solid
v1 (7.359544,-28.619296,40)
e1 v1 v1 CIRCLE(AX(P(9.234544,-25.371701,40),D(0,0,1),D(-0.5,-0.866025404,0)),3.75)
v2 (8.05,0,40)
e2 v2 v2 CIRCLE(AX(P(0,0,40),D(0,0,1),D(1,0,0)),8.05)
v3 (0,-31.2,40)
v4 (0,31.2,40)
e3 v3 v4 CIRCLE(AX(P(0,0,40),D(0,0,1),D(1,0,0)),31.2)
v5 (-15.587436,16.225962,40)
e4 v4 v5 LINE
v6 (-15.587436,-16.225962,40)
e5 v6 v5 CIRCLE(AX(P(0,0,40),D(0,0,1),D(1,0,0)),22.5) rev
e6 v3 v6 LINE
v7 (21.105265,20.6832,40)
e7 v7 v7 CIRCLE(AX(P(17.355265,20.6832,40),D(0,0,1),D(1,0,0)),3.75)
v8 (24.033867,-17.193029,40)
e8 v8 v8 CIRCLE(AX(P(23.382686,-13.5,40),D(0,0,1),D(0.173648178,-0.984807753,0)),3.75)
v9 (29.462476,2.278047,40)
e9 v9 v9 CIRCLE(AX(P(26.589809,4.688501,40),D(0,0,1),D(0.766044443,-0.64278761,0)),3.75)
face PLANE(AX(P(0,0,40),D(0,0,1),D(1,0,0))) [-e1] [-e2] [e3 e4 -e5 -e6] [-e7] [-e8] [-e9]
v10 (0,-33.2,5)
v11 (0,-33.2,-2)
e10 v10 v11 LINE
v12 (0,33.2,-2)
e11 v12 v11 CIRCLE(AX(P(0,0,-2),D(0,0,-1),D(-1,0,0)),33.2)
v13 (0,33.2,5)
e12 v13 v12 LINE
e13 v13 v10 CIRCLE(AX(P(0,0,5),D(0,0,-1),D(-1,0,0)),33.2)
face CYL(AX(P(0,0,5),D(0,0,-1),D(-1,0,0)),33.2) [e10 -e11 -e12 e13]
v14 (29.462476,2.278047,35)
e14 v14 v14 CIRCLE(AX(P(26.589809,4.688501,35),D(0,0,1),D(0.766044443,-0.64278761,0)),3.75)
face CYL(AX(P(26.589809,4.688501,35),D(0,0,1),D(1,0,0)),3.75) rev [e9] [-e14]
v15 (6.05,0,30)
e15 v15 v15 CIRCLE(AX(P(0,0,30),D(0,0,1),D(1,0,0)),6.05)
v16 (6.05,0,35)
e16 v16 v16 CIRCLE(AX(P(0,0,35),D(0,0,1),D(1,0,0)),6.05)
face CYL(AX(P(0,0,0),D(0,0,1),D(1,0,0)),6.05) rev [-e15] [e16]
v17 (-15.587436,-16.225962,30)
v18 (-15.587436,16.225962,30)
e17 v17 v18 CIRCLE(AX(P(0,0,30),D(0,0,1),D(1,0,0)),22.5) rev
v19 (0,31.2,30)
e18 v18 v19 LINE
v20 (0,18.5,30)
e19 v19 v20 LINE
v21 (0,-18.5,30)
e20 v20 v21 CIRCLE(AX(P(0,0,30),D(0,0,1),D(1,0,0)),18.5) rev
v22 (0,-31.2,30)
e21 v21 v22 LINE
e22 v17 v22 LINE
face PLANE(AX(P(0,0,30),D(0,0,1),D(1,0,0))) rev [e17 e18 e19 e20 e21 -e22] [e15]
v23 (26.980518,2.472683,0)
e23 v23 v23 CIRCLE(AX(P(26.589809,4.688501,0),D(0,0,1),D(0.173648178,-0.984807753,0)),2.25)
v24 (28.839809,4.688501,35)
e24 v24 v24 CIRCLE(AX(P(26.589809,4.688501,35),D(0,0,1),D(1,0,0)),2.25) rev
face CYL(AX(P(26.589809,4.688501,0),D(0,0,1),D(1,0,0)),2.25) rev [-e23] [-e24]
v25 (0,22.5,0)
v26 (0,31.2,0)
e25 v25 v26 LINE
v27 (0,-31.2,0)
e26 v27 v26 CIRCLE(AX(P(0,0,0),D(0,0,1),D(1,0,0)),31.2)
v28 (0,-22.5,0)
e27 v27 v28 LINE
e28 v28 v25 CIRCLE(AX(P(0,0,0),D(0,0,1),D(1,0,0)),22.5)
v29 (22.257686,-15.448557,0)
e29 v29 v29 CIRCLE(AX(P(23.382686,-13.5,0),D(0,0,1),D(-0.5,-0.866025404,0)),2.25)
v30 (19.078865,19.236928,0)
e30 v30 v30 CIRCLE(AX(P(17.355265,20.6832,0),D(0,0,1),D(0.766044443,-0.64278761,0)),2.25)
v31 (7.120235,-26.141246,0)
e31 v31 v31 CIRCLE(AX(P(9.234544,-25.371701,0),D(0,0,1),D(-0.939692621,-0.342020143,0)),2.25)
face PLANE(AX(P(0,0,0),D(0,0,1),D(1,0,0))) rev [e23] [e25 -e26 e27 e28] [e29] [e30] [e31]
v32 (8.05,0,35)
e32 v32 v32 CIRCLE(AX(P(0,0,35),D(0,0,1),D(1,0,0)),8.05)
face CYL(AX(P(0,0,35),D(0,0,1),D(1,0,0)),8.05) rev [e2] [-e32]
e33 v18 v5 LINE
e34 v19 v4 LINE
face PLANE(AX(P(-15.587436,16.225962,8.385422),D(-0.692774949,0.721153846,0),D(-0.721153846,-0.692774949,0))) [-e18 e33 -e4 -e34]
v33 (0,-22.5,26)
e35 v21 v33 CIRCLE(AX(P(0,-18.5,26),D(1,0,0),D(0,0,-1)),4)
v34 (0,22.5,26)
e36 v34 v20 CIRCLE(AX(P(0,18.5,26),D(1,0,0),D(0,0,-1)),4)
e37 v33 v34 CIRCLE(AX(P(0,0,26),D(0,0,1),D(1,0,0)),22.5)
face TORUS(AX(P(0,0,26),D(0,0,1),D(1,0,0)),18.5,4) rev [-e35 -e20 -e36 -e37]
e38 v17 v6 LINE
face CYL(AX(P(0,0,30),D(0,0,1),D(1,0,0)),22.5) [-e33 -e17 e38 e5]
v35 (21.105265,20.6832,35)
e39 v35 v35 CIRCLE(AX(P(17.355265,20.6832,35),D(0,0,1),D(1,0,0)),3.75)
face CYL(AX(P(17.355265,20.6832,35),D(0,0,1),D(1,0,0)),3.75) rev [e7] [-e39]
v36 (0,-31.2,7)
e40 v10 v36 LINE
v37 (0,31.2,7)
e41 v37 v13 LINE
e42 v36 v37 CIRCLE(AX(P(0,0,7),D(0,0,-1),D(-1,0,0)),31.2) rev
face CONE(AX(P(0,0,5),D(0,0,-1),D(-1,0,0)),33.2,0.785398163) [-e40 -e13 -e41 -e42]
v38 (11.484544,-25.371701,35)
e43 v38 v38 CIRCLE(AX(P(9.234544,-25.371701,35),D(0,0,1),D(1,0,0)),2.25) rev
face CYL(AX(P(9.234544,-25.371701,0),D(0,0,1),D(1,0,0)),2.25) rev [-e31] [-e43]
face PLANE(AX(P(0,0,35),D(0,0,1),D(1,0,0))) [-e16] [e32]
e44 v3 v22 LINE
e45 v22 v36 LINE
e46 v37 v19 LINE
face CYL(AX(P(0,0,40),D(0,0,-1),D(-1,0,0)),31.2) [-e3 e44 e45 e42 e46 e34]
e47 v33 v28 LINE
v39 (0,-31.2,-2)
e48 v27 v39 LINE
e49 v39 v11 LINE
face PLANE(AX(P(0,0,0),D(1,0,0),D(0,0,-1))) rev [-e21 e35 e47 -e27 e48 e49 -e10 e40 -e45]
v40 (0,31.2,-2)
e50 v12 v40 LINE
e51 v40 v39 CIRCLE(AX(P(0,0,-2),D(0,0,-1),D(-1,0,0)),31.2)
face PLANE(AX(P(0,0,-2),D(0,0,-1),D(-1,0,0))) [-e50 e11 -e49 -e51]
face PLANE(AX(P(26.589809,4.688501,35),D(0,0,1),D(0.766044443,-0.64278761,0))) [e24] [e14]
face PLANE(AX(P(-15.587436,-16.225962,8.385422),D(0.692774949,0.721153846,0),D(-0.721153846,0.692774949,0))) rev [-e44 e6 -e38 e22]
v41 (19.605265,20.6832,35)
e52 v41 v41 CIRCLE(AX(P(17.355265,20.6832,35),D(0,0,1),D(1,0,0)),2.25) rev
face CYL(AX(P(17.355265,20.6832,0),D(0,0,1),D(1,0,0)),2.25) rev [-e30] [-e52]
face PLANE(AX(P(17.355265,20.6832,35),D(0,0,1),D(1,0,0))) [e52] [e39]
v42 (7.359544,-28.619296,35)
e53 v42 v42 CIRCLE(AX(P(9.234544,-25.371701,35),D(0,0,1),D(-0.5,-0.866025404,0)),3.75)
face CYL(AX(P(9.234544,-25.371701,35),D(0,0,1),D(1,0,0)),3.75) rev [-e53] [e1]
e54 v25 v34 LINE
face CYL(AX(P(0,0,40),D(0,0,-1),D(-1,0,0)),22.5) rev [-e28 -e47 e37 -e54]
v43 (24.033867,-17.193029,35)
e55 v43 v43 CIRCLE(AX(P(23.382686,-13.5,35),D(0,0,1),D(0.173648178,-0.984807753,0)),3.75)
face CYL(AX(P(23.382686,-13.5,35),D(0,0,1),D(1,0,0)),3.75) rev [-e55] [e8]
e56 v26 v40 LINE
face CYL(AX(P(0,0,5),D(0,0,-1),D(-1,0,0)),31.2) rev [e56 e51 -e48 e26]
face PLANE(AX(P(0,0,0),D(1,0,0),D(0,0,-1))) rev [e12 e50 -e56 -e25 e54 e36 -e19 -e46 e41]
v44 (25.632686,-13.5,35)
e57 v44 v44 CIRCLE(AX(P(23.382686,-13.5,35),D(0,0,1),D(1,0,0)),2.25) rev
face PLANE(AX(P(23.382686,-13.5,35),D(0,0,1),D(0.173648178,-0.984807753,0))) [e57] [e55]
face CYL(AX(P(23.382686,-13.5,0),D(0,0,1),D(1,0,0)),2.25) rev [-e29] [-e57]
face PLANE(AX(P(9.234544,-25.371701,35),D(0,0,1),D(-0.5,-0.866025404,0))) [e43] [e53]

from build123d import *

# Parameters (mm, degrees)
SCHIZZO1_R                        = 31.2
SCHIZZO1_R_2                      = 22.5
ESTRUSIONE_ESTRUSIONE1_DEPTH      = 40
SCHIZZO2_R                        = 2.25
TAGLIO_ESTRUSIONE1_DEPTH          = 60.555688225
RIPETIZIONECIRCOLARE1_COUNT       = 9
SCHIZZO3_W                        = 40
SCHIZZO3_H                        = 62.4
TAGLIO_ESTRUSIONE2_DEPTH          = 39
ESTRUSIONE_ESTRUSIONE2_START      = -10
ESTRUSIONE_ESTRUSIONE2_DEPTH      = 10
SCHIZZO5_R                        = 8.05
TAGLIO_ESTRUSIONE3_DEPTH          = 5
SCHIZZO6_R                        = 6.05
TAGLIO_ESTRUSIONE6_DEPTH          = 57.31944602
SCHIZZO7_R                        = 3.75
TAGLIO_ESTRUSIONE7_DEPTH          = 5
RIPETIZIONECIRCOLARE2_COUNT       = 9
ESTRUSIONE_ESTRUSIONE3_DEPTH      = 2
ESTRUSIONE_ESTRUSIONE3_DEPTH_BACK = 5
SMUSSO1_SIZE                      = 2
RACCORDO2_R                       = 4
ESTRUSIONE_ESTRUSIONE4_DEPTH      = 40
ESTRUSIONE_ESTRUSIONE5_START      = -10
ESTRUSIONE_ESTRUSIONE5_DEPTH      = 10


# Some blends are built 0.0001 mm under size
with BuildPart() as part:
    # Schizzo1 → Estrusione-Estrusione1 (new body)
    with BuildSketch(Plane.XY):
        Circle(SCHIZZO1_R)
        Circle(SCHIZZO1_R_2, mode=Mode.SUBTRACT)
    extrude(amount=ESTRUSIONE_ESTRUSIONE1_DEPTH)

    # Schizzo2 → Taglio-Estrusione1 (cut, through all)
    with BuildSketch(Plane.XY.offset(40)):
        with Locations((0, 27)):
            Circle(SCHIZZO2_R)
    taglio_estrusione1 = extrude(amount=-TAGLIO_ESTRUSIONE1_DEPTH, mode=Mode.SUBTRACT)

    # RipetizioneCircolare1: Taglio-Estrusione1 ×9 about axis
    ripetizionecircolare1_axis = Axis((0, 0, 0), (0, 0, 1))
    for i in range(1, RIPETIZIONECIRCOLARE1_COUNT):
        add(taglio_estrusione1.rotate(ripetizionecircolare1_axis, i * 360 / RIPETIZIONECIRCOLARE1_COUNT), mode=Mode.SUBTRACT)

    # Schizzo3 → Taglio-Estrusione2 (cut)
    with BuildSketch(Plane(origin=(0, 0, 0), x_dir=(0, 0, -1), z_dir=(1, 0, 0))):
        with Locations((-20, 0)):
            Rectangle(SCHIZZO3_W, SCHIZZO3_H)
    extrude(amount=-TAGLIO_ESTRUSIONE2_DEPTH, mode=Mode.SUBTRACT)

    # Schizzo4 → Estrusione-Estrusione2 (add)
    with BuildSketch(Plane.XY.offset(40).offset(ESTRUSIONE_ESTRUSIONE2_START)):
        with BuildLine():
            Line((0, 22.5), (0, -22.5))
            ThreePointArc((0, -22.5), (22.5, 0), (0, 22.5))
        make_face()
        with BuildLine():
            ThreePointArc((22.5, 0), (15.909902577, 15.909902577), (0, 22.5))
            Line((0, 22.5), (0, -22.5))
            ThreePointArc((0, -22.5), (15.909902577, -15.909902577), (22.5, 0))
        make_face()
        with BuildLine():
            Line((0, -22.5), (0, 22.5))
            ThreePointArc((0, 22.5), (-22.5, 0), (0, -22.5))
        make_face()
    extrude(amount=ESTRUSIONE_ESTRUSIONE2_DEPTH)

    # Schizzo5 → Taglio-Estrusione3 (cut)
    with BuildSketch(Plane.XY.offset(40)):
        Circle(SCHIZZO5_R)
    extrude(amount=-TAGLIO_ESTRUSIONE3_DEPTH, mode=Mode.SUBTRACT)

    # Schizzo6 → Taglio-Estrusione6 (cut, through all)
    with BuildSketch(Plane.XY.offset(35)):
        Circle(SCHIZZO6_R)
    extrude(amount=-TAGLIO_ESTRUSIONE6_DEPTH, mode=Mode.SUBTRACT)

    # Schizzo7 → Taglio-Estrusione7 (cut)
    with BuildSketch(Plane.XY.offset(40)):
        with Locations((17.355265462, 20.683199964)):
            Circle(SCHIZZO7_R)
    taglio_estrusione7 = extrude(amount=-TAGLIO_ESTRUSIONE7_DEPTH, mode=Mode.SUBTRACT)

    # RipetizioneCircolare2: Taglio-Estrusione7 ×9 about axis
    ripetizionecircolare2_axis = Axis((0, 0, 0), (0, 0, 1))
    for i in range(1, RIPETIZIONECIRCOLARE2_COUNT):
        add(taglio_estrusione7.rotate(ripetizionecircolare2_axis, i * 360 / RIPETIZIONECIRCOLARE2_COUNT), mode=Mode.SUBTRACT)

    # Schizzo8 → Estrusione-Estrusione3 (add, two sides: drawn at the far end of the back side and taken through both)
    with BuildSketch(Plane(origin=(0, 0, 0), x_dir=(-1, 0, 0), z_dir=(0, 0, -1)).offset(-ESTRUSIONE_ESTRUSIONE3_DEPTH_BACK)):
        with BuildLine():
            Line((0, 31.2), (0, 33.2))
            ThreePointArc((0, 33.2), (-33.2, 0), (0, -33.2))
            Line((0, -33.2), (0, -31.2))
            ThreePointArc((0, -31.2), (-31.2, 0), (0, 31.2))
        make_face()
    extrude(amount=ESTRUSIONE_ESTRUSIONE3_DEPTH + ESTRUSIONE_ESTRUSIONE3_DEPTH_BACK)

    # Smusso1
    smusso1_edges = [part.edges().sort_by_distance(p)[0] for p in [
        (31.2, 0, 5),
    ]]
    chamfer(smusso1_edges, length=SMUSSO1_SIZE - 0.0001)  # a hair under: the kernel refuses the full size

    # Raccordo2
    # the kernel refuses this fillet: 4 mm, written as the material it adds along each edge
    with BuildSketch(Plane(origin=(0, 0, 30), x_dir=(0, -1, 0), z_dir=(-1, 0, 0))) as raccordo2_piece_1:
        with BuildLine():
            CenterArc((22.5 - RACCORDO2_R, -RACCORDO2_R), RACCORDO2_R, 0, 90)
            Line((22.5 - RACCORDO2_R, 0), (22.5, 0))
            Line((22.5, 0), (22.5, -RACCORDO2_R))
        make_face()
    revolve(axis=Axis((0, 0, 30), (0, 0, 1)), revolution_arc=180)

    # Schizzo9 → Estrusione-Estrusione4 (add)
    with BuildSketch(Plane.XY.offset(40)):
        with BuildLine():
            Line((0, 30.75), (0, 23.25))
            ThreePointArc((0, 23.25), (3.75, 27), (0, 30.75))
        make_face()
    extrude(amount=-ESTRUSIONE_ESTRUSIONE4_DEPTH)

    # Schizzo10 → Estrusione-Estrusione5 (add)
    with BuildSketch(Plane.XY.offset(40).offset(ESTRUSIONE_ESTRUSIONE5_START)):
        with BuildLine():
            Line((0, 22.5), (0, 31.2))
            Line((0, 31.2), (-15.587436356, 16.225961538))
            ThreePointArc((-15.587436356, 16.225961538), (-8.40136493, 20.872639203), (0, 22.5))
        make_face()
        with BuildLine():
            ThreePointArc((0, -22.5), (-8.40136493, -20.872639203), (-15.587436356, -16.225961538))
            Line((-15.587436356, -16.225961538), (0, -31.2))
            Line((0, -31.2), (0, -22.5))
        make_face()
    extrude(amount=ESTRUSIONE_ESTRUSIONE5_DEPTH)


solid = part.part
